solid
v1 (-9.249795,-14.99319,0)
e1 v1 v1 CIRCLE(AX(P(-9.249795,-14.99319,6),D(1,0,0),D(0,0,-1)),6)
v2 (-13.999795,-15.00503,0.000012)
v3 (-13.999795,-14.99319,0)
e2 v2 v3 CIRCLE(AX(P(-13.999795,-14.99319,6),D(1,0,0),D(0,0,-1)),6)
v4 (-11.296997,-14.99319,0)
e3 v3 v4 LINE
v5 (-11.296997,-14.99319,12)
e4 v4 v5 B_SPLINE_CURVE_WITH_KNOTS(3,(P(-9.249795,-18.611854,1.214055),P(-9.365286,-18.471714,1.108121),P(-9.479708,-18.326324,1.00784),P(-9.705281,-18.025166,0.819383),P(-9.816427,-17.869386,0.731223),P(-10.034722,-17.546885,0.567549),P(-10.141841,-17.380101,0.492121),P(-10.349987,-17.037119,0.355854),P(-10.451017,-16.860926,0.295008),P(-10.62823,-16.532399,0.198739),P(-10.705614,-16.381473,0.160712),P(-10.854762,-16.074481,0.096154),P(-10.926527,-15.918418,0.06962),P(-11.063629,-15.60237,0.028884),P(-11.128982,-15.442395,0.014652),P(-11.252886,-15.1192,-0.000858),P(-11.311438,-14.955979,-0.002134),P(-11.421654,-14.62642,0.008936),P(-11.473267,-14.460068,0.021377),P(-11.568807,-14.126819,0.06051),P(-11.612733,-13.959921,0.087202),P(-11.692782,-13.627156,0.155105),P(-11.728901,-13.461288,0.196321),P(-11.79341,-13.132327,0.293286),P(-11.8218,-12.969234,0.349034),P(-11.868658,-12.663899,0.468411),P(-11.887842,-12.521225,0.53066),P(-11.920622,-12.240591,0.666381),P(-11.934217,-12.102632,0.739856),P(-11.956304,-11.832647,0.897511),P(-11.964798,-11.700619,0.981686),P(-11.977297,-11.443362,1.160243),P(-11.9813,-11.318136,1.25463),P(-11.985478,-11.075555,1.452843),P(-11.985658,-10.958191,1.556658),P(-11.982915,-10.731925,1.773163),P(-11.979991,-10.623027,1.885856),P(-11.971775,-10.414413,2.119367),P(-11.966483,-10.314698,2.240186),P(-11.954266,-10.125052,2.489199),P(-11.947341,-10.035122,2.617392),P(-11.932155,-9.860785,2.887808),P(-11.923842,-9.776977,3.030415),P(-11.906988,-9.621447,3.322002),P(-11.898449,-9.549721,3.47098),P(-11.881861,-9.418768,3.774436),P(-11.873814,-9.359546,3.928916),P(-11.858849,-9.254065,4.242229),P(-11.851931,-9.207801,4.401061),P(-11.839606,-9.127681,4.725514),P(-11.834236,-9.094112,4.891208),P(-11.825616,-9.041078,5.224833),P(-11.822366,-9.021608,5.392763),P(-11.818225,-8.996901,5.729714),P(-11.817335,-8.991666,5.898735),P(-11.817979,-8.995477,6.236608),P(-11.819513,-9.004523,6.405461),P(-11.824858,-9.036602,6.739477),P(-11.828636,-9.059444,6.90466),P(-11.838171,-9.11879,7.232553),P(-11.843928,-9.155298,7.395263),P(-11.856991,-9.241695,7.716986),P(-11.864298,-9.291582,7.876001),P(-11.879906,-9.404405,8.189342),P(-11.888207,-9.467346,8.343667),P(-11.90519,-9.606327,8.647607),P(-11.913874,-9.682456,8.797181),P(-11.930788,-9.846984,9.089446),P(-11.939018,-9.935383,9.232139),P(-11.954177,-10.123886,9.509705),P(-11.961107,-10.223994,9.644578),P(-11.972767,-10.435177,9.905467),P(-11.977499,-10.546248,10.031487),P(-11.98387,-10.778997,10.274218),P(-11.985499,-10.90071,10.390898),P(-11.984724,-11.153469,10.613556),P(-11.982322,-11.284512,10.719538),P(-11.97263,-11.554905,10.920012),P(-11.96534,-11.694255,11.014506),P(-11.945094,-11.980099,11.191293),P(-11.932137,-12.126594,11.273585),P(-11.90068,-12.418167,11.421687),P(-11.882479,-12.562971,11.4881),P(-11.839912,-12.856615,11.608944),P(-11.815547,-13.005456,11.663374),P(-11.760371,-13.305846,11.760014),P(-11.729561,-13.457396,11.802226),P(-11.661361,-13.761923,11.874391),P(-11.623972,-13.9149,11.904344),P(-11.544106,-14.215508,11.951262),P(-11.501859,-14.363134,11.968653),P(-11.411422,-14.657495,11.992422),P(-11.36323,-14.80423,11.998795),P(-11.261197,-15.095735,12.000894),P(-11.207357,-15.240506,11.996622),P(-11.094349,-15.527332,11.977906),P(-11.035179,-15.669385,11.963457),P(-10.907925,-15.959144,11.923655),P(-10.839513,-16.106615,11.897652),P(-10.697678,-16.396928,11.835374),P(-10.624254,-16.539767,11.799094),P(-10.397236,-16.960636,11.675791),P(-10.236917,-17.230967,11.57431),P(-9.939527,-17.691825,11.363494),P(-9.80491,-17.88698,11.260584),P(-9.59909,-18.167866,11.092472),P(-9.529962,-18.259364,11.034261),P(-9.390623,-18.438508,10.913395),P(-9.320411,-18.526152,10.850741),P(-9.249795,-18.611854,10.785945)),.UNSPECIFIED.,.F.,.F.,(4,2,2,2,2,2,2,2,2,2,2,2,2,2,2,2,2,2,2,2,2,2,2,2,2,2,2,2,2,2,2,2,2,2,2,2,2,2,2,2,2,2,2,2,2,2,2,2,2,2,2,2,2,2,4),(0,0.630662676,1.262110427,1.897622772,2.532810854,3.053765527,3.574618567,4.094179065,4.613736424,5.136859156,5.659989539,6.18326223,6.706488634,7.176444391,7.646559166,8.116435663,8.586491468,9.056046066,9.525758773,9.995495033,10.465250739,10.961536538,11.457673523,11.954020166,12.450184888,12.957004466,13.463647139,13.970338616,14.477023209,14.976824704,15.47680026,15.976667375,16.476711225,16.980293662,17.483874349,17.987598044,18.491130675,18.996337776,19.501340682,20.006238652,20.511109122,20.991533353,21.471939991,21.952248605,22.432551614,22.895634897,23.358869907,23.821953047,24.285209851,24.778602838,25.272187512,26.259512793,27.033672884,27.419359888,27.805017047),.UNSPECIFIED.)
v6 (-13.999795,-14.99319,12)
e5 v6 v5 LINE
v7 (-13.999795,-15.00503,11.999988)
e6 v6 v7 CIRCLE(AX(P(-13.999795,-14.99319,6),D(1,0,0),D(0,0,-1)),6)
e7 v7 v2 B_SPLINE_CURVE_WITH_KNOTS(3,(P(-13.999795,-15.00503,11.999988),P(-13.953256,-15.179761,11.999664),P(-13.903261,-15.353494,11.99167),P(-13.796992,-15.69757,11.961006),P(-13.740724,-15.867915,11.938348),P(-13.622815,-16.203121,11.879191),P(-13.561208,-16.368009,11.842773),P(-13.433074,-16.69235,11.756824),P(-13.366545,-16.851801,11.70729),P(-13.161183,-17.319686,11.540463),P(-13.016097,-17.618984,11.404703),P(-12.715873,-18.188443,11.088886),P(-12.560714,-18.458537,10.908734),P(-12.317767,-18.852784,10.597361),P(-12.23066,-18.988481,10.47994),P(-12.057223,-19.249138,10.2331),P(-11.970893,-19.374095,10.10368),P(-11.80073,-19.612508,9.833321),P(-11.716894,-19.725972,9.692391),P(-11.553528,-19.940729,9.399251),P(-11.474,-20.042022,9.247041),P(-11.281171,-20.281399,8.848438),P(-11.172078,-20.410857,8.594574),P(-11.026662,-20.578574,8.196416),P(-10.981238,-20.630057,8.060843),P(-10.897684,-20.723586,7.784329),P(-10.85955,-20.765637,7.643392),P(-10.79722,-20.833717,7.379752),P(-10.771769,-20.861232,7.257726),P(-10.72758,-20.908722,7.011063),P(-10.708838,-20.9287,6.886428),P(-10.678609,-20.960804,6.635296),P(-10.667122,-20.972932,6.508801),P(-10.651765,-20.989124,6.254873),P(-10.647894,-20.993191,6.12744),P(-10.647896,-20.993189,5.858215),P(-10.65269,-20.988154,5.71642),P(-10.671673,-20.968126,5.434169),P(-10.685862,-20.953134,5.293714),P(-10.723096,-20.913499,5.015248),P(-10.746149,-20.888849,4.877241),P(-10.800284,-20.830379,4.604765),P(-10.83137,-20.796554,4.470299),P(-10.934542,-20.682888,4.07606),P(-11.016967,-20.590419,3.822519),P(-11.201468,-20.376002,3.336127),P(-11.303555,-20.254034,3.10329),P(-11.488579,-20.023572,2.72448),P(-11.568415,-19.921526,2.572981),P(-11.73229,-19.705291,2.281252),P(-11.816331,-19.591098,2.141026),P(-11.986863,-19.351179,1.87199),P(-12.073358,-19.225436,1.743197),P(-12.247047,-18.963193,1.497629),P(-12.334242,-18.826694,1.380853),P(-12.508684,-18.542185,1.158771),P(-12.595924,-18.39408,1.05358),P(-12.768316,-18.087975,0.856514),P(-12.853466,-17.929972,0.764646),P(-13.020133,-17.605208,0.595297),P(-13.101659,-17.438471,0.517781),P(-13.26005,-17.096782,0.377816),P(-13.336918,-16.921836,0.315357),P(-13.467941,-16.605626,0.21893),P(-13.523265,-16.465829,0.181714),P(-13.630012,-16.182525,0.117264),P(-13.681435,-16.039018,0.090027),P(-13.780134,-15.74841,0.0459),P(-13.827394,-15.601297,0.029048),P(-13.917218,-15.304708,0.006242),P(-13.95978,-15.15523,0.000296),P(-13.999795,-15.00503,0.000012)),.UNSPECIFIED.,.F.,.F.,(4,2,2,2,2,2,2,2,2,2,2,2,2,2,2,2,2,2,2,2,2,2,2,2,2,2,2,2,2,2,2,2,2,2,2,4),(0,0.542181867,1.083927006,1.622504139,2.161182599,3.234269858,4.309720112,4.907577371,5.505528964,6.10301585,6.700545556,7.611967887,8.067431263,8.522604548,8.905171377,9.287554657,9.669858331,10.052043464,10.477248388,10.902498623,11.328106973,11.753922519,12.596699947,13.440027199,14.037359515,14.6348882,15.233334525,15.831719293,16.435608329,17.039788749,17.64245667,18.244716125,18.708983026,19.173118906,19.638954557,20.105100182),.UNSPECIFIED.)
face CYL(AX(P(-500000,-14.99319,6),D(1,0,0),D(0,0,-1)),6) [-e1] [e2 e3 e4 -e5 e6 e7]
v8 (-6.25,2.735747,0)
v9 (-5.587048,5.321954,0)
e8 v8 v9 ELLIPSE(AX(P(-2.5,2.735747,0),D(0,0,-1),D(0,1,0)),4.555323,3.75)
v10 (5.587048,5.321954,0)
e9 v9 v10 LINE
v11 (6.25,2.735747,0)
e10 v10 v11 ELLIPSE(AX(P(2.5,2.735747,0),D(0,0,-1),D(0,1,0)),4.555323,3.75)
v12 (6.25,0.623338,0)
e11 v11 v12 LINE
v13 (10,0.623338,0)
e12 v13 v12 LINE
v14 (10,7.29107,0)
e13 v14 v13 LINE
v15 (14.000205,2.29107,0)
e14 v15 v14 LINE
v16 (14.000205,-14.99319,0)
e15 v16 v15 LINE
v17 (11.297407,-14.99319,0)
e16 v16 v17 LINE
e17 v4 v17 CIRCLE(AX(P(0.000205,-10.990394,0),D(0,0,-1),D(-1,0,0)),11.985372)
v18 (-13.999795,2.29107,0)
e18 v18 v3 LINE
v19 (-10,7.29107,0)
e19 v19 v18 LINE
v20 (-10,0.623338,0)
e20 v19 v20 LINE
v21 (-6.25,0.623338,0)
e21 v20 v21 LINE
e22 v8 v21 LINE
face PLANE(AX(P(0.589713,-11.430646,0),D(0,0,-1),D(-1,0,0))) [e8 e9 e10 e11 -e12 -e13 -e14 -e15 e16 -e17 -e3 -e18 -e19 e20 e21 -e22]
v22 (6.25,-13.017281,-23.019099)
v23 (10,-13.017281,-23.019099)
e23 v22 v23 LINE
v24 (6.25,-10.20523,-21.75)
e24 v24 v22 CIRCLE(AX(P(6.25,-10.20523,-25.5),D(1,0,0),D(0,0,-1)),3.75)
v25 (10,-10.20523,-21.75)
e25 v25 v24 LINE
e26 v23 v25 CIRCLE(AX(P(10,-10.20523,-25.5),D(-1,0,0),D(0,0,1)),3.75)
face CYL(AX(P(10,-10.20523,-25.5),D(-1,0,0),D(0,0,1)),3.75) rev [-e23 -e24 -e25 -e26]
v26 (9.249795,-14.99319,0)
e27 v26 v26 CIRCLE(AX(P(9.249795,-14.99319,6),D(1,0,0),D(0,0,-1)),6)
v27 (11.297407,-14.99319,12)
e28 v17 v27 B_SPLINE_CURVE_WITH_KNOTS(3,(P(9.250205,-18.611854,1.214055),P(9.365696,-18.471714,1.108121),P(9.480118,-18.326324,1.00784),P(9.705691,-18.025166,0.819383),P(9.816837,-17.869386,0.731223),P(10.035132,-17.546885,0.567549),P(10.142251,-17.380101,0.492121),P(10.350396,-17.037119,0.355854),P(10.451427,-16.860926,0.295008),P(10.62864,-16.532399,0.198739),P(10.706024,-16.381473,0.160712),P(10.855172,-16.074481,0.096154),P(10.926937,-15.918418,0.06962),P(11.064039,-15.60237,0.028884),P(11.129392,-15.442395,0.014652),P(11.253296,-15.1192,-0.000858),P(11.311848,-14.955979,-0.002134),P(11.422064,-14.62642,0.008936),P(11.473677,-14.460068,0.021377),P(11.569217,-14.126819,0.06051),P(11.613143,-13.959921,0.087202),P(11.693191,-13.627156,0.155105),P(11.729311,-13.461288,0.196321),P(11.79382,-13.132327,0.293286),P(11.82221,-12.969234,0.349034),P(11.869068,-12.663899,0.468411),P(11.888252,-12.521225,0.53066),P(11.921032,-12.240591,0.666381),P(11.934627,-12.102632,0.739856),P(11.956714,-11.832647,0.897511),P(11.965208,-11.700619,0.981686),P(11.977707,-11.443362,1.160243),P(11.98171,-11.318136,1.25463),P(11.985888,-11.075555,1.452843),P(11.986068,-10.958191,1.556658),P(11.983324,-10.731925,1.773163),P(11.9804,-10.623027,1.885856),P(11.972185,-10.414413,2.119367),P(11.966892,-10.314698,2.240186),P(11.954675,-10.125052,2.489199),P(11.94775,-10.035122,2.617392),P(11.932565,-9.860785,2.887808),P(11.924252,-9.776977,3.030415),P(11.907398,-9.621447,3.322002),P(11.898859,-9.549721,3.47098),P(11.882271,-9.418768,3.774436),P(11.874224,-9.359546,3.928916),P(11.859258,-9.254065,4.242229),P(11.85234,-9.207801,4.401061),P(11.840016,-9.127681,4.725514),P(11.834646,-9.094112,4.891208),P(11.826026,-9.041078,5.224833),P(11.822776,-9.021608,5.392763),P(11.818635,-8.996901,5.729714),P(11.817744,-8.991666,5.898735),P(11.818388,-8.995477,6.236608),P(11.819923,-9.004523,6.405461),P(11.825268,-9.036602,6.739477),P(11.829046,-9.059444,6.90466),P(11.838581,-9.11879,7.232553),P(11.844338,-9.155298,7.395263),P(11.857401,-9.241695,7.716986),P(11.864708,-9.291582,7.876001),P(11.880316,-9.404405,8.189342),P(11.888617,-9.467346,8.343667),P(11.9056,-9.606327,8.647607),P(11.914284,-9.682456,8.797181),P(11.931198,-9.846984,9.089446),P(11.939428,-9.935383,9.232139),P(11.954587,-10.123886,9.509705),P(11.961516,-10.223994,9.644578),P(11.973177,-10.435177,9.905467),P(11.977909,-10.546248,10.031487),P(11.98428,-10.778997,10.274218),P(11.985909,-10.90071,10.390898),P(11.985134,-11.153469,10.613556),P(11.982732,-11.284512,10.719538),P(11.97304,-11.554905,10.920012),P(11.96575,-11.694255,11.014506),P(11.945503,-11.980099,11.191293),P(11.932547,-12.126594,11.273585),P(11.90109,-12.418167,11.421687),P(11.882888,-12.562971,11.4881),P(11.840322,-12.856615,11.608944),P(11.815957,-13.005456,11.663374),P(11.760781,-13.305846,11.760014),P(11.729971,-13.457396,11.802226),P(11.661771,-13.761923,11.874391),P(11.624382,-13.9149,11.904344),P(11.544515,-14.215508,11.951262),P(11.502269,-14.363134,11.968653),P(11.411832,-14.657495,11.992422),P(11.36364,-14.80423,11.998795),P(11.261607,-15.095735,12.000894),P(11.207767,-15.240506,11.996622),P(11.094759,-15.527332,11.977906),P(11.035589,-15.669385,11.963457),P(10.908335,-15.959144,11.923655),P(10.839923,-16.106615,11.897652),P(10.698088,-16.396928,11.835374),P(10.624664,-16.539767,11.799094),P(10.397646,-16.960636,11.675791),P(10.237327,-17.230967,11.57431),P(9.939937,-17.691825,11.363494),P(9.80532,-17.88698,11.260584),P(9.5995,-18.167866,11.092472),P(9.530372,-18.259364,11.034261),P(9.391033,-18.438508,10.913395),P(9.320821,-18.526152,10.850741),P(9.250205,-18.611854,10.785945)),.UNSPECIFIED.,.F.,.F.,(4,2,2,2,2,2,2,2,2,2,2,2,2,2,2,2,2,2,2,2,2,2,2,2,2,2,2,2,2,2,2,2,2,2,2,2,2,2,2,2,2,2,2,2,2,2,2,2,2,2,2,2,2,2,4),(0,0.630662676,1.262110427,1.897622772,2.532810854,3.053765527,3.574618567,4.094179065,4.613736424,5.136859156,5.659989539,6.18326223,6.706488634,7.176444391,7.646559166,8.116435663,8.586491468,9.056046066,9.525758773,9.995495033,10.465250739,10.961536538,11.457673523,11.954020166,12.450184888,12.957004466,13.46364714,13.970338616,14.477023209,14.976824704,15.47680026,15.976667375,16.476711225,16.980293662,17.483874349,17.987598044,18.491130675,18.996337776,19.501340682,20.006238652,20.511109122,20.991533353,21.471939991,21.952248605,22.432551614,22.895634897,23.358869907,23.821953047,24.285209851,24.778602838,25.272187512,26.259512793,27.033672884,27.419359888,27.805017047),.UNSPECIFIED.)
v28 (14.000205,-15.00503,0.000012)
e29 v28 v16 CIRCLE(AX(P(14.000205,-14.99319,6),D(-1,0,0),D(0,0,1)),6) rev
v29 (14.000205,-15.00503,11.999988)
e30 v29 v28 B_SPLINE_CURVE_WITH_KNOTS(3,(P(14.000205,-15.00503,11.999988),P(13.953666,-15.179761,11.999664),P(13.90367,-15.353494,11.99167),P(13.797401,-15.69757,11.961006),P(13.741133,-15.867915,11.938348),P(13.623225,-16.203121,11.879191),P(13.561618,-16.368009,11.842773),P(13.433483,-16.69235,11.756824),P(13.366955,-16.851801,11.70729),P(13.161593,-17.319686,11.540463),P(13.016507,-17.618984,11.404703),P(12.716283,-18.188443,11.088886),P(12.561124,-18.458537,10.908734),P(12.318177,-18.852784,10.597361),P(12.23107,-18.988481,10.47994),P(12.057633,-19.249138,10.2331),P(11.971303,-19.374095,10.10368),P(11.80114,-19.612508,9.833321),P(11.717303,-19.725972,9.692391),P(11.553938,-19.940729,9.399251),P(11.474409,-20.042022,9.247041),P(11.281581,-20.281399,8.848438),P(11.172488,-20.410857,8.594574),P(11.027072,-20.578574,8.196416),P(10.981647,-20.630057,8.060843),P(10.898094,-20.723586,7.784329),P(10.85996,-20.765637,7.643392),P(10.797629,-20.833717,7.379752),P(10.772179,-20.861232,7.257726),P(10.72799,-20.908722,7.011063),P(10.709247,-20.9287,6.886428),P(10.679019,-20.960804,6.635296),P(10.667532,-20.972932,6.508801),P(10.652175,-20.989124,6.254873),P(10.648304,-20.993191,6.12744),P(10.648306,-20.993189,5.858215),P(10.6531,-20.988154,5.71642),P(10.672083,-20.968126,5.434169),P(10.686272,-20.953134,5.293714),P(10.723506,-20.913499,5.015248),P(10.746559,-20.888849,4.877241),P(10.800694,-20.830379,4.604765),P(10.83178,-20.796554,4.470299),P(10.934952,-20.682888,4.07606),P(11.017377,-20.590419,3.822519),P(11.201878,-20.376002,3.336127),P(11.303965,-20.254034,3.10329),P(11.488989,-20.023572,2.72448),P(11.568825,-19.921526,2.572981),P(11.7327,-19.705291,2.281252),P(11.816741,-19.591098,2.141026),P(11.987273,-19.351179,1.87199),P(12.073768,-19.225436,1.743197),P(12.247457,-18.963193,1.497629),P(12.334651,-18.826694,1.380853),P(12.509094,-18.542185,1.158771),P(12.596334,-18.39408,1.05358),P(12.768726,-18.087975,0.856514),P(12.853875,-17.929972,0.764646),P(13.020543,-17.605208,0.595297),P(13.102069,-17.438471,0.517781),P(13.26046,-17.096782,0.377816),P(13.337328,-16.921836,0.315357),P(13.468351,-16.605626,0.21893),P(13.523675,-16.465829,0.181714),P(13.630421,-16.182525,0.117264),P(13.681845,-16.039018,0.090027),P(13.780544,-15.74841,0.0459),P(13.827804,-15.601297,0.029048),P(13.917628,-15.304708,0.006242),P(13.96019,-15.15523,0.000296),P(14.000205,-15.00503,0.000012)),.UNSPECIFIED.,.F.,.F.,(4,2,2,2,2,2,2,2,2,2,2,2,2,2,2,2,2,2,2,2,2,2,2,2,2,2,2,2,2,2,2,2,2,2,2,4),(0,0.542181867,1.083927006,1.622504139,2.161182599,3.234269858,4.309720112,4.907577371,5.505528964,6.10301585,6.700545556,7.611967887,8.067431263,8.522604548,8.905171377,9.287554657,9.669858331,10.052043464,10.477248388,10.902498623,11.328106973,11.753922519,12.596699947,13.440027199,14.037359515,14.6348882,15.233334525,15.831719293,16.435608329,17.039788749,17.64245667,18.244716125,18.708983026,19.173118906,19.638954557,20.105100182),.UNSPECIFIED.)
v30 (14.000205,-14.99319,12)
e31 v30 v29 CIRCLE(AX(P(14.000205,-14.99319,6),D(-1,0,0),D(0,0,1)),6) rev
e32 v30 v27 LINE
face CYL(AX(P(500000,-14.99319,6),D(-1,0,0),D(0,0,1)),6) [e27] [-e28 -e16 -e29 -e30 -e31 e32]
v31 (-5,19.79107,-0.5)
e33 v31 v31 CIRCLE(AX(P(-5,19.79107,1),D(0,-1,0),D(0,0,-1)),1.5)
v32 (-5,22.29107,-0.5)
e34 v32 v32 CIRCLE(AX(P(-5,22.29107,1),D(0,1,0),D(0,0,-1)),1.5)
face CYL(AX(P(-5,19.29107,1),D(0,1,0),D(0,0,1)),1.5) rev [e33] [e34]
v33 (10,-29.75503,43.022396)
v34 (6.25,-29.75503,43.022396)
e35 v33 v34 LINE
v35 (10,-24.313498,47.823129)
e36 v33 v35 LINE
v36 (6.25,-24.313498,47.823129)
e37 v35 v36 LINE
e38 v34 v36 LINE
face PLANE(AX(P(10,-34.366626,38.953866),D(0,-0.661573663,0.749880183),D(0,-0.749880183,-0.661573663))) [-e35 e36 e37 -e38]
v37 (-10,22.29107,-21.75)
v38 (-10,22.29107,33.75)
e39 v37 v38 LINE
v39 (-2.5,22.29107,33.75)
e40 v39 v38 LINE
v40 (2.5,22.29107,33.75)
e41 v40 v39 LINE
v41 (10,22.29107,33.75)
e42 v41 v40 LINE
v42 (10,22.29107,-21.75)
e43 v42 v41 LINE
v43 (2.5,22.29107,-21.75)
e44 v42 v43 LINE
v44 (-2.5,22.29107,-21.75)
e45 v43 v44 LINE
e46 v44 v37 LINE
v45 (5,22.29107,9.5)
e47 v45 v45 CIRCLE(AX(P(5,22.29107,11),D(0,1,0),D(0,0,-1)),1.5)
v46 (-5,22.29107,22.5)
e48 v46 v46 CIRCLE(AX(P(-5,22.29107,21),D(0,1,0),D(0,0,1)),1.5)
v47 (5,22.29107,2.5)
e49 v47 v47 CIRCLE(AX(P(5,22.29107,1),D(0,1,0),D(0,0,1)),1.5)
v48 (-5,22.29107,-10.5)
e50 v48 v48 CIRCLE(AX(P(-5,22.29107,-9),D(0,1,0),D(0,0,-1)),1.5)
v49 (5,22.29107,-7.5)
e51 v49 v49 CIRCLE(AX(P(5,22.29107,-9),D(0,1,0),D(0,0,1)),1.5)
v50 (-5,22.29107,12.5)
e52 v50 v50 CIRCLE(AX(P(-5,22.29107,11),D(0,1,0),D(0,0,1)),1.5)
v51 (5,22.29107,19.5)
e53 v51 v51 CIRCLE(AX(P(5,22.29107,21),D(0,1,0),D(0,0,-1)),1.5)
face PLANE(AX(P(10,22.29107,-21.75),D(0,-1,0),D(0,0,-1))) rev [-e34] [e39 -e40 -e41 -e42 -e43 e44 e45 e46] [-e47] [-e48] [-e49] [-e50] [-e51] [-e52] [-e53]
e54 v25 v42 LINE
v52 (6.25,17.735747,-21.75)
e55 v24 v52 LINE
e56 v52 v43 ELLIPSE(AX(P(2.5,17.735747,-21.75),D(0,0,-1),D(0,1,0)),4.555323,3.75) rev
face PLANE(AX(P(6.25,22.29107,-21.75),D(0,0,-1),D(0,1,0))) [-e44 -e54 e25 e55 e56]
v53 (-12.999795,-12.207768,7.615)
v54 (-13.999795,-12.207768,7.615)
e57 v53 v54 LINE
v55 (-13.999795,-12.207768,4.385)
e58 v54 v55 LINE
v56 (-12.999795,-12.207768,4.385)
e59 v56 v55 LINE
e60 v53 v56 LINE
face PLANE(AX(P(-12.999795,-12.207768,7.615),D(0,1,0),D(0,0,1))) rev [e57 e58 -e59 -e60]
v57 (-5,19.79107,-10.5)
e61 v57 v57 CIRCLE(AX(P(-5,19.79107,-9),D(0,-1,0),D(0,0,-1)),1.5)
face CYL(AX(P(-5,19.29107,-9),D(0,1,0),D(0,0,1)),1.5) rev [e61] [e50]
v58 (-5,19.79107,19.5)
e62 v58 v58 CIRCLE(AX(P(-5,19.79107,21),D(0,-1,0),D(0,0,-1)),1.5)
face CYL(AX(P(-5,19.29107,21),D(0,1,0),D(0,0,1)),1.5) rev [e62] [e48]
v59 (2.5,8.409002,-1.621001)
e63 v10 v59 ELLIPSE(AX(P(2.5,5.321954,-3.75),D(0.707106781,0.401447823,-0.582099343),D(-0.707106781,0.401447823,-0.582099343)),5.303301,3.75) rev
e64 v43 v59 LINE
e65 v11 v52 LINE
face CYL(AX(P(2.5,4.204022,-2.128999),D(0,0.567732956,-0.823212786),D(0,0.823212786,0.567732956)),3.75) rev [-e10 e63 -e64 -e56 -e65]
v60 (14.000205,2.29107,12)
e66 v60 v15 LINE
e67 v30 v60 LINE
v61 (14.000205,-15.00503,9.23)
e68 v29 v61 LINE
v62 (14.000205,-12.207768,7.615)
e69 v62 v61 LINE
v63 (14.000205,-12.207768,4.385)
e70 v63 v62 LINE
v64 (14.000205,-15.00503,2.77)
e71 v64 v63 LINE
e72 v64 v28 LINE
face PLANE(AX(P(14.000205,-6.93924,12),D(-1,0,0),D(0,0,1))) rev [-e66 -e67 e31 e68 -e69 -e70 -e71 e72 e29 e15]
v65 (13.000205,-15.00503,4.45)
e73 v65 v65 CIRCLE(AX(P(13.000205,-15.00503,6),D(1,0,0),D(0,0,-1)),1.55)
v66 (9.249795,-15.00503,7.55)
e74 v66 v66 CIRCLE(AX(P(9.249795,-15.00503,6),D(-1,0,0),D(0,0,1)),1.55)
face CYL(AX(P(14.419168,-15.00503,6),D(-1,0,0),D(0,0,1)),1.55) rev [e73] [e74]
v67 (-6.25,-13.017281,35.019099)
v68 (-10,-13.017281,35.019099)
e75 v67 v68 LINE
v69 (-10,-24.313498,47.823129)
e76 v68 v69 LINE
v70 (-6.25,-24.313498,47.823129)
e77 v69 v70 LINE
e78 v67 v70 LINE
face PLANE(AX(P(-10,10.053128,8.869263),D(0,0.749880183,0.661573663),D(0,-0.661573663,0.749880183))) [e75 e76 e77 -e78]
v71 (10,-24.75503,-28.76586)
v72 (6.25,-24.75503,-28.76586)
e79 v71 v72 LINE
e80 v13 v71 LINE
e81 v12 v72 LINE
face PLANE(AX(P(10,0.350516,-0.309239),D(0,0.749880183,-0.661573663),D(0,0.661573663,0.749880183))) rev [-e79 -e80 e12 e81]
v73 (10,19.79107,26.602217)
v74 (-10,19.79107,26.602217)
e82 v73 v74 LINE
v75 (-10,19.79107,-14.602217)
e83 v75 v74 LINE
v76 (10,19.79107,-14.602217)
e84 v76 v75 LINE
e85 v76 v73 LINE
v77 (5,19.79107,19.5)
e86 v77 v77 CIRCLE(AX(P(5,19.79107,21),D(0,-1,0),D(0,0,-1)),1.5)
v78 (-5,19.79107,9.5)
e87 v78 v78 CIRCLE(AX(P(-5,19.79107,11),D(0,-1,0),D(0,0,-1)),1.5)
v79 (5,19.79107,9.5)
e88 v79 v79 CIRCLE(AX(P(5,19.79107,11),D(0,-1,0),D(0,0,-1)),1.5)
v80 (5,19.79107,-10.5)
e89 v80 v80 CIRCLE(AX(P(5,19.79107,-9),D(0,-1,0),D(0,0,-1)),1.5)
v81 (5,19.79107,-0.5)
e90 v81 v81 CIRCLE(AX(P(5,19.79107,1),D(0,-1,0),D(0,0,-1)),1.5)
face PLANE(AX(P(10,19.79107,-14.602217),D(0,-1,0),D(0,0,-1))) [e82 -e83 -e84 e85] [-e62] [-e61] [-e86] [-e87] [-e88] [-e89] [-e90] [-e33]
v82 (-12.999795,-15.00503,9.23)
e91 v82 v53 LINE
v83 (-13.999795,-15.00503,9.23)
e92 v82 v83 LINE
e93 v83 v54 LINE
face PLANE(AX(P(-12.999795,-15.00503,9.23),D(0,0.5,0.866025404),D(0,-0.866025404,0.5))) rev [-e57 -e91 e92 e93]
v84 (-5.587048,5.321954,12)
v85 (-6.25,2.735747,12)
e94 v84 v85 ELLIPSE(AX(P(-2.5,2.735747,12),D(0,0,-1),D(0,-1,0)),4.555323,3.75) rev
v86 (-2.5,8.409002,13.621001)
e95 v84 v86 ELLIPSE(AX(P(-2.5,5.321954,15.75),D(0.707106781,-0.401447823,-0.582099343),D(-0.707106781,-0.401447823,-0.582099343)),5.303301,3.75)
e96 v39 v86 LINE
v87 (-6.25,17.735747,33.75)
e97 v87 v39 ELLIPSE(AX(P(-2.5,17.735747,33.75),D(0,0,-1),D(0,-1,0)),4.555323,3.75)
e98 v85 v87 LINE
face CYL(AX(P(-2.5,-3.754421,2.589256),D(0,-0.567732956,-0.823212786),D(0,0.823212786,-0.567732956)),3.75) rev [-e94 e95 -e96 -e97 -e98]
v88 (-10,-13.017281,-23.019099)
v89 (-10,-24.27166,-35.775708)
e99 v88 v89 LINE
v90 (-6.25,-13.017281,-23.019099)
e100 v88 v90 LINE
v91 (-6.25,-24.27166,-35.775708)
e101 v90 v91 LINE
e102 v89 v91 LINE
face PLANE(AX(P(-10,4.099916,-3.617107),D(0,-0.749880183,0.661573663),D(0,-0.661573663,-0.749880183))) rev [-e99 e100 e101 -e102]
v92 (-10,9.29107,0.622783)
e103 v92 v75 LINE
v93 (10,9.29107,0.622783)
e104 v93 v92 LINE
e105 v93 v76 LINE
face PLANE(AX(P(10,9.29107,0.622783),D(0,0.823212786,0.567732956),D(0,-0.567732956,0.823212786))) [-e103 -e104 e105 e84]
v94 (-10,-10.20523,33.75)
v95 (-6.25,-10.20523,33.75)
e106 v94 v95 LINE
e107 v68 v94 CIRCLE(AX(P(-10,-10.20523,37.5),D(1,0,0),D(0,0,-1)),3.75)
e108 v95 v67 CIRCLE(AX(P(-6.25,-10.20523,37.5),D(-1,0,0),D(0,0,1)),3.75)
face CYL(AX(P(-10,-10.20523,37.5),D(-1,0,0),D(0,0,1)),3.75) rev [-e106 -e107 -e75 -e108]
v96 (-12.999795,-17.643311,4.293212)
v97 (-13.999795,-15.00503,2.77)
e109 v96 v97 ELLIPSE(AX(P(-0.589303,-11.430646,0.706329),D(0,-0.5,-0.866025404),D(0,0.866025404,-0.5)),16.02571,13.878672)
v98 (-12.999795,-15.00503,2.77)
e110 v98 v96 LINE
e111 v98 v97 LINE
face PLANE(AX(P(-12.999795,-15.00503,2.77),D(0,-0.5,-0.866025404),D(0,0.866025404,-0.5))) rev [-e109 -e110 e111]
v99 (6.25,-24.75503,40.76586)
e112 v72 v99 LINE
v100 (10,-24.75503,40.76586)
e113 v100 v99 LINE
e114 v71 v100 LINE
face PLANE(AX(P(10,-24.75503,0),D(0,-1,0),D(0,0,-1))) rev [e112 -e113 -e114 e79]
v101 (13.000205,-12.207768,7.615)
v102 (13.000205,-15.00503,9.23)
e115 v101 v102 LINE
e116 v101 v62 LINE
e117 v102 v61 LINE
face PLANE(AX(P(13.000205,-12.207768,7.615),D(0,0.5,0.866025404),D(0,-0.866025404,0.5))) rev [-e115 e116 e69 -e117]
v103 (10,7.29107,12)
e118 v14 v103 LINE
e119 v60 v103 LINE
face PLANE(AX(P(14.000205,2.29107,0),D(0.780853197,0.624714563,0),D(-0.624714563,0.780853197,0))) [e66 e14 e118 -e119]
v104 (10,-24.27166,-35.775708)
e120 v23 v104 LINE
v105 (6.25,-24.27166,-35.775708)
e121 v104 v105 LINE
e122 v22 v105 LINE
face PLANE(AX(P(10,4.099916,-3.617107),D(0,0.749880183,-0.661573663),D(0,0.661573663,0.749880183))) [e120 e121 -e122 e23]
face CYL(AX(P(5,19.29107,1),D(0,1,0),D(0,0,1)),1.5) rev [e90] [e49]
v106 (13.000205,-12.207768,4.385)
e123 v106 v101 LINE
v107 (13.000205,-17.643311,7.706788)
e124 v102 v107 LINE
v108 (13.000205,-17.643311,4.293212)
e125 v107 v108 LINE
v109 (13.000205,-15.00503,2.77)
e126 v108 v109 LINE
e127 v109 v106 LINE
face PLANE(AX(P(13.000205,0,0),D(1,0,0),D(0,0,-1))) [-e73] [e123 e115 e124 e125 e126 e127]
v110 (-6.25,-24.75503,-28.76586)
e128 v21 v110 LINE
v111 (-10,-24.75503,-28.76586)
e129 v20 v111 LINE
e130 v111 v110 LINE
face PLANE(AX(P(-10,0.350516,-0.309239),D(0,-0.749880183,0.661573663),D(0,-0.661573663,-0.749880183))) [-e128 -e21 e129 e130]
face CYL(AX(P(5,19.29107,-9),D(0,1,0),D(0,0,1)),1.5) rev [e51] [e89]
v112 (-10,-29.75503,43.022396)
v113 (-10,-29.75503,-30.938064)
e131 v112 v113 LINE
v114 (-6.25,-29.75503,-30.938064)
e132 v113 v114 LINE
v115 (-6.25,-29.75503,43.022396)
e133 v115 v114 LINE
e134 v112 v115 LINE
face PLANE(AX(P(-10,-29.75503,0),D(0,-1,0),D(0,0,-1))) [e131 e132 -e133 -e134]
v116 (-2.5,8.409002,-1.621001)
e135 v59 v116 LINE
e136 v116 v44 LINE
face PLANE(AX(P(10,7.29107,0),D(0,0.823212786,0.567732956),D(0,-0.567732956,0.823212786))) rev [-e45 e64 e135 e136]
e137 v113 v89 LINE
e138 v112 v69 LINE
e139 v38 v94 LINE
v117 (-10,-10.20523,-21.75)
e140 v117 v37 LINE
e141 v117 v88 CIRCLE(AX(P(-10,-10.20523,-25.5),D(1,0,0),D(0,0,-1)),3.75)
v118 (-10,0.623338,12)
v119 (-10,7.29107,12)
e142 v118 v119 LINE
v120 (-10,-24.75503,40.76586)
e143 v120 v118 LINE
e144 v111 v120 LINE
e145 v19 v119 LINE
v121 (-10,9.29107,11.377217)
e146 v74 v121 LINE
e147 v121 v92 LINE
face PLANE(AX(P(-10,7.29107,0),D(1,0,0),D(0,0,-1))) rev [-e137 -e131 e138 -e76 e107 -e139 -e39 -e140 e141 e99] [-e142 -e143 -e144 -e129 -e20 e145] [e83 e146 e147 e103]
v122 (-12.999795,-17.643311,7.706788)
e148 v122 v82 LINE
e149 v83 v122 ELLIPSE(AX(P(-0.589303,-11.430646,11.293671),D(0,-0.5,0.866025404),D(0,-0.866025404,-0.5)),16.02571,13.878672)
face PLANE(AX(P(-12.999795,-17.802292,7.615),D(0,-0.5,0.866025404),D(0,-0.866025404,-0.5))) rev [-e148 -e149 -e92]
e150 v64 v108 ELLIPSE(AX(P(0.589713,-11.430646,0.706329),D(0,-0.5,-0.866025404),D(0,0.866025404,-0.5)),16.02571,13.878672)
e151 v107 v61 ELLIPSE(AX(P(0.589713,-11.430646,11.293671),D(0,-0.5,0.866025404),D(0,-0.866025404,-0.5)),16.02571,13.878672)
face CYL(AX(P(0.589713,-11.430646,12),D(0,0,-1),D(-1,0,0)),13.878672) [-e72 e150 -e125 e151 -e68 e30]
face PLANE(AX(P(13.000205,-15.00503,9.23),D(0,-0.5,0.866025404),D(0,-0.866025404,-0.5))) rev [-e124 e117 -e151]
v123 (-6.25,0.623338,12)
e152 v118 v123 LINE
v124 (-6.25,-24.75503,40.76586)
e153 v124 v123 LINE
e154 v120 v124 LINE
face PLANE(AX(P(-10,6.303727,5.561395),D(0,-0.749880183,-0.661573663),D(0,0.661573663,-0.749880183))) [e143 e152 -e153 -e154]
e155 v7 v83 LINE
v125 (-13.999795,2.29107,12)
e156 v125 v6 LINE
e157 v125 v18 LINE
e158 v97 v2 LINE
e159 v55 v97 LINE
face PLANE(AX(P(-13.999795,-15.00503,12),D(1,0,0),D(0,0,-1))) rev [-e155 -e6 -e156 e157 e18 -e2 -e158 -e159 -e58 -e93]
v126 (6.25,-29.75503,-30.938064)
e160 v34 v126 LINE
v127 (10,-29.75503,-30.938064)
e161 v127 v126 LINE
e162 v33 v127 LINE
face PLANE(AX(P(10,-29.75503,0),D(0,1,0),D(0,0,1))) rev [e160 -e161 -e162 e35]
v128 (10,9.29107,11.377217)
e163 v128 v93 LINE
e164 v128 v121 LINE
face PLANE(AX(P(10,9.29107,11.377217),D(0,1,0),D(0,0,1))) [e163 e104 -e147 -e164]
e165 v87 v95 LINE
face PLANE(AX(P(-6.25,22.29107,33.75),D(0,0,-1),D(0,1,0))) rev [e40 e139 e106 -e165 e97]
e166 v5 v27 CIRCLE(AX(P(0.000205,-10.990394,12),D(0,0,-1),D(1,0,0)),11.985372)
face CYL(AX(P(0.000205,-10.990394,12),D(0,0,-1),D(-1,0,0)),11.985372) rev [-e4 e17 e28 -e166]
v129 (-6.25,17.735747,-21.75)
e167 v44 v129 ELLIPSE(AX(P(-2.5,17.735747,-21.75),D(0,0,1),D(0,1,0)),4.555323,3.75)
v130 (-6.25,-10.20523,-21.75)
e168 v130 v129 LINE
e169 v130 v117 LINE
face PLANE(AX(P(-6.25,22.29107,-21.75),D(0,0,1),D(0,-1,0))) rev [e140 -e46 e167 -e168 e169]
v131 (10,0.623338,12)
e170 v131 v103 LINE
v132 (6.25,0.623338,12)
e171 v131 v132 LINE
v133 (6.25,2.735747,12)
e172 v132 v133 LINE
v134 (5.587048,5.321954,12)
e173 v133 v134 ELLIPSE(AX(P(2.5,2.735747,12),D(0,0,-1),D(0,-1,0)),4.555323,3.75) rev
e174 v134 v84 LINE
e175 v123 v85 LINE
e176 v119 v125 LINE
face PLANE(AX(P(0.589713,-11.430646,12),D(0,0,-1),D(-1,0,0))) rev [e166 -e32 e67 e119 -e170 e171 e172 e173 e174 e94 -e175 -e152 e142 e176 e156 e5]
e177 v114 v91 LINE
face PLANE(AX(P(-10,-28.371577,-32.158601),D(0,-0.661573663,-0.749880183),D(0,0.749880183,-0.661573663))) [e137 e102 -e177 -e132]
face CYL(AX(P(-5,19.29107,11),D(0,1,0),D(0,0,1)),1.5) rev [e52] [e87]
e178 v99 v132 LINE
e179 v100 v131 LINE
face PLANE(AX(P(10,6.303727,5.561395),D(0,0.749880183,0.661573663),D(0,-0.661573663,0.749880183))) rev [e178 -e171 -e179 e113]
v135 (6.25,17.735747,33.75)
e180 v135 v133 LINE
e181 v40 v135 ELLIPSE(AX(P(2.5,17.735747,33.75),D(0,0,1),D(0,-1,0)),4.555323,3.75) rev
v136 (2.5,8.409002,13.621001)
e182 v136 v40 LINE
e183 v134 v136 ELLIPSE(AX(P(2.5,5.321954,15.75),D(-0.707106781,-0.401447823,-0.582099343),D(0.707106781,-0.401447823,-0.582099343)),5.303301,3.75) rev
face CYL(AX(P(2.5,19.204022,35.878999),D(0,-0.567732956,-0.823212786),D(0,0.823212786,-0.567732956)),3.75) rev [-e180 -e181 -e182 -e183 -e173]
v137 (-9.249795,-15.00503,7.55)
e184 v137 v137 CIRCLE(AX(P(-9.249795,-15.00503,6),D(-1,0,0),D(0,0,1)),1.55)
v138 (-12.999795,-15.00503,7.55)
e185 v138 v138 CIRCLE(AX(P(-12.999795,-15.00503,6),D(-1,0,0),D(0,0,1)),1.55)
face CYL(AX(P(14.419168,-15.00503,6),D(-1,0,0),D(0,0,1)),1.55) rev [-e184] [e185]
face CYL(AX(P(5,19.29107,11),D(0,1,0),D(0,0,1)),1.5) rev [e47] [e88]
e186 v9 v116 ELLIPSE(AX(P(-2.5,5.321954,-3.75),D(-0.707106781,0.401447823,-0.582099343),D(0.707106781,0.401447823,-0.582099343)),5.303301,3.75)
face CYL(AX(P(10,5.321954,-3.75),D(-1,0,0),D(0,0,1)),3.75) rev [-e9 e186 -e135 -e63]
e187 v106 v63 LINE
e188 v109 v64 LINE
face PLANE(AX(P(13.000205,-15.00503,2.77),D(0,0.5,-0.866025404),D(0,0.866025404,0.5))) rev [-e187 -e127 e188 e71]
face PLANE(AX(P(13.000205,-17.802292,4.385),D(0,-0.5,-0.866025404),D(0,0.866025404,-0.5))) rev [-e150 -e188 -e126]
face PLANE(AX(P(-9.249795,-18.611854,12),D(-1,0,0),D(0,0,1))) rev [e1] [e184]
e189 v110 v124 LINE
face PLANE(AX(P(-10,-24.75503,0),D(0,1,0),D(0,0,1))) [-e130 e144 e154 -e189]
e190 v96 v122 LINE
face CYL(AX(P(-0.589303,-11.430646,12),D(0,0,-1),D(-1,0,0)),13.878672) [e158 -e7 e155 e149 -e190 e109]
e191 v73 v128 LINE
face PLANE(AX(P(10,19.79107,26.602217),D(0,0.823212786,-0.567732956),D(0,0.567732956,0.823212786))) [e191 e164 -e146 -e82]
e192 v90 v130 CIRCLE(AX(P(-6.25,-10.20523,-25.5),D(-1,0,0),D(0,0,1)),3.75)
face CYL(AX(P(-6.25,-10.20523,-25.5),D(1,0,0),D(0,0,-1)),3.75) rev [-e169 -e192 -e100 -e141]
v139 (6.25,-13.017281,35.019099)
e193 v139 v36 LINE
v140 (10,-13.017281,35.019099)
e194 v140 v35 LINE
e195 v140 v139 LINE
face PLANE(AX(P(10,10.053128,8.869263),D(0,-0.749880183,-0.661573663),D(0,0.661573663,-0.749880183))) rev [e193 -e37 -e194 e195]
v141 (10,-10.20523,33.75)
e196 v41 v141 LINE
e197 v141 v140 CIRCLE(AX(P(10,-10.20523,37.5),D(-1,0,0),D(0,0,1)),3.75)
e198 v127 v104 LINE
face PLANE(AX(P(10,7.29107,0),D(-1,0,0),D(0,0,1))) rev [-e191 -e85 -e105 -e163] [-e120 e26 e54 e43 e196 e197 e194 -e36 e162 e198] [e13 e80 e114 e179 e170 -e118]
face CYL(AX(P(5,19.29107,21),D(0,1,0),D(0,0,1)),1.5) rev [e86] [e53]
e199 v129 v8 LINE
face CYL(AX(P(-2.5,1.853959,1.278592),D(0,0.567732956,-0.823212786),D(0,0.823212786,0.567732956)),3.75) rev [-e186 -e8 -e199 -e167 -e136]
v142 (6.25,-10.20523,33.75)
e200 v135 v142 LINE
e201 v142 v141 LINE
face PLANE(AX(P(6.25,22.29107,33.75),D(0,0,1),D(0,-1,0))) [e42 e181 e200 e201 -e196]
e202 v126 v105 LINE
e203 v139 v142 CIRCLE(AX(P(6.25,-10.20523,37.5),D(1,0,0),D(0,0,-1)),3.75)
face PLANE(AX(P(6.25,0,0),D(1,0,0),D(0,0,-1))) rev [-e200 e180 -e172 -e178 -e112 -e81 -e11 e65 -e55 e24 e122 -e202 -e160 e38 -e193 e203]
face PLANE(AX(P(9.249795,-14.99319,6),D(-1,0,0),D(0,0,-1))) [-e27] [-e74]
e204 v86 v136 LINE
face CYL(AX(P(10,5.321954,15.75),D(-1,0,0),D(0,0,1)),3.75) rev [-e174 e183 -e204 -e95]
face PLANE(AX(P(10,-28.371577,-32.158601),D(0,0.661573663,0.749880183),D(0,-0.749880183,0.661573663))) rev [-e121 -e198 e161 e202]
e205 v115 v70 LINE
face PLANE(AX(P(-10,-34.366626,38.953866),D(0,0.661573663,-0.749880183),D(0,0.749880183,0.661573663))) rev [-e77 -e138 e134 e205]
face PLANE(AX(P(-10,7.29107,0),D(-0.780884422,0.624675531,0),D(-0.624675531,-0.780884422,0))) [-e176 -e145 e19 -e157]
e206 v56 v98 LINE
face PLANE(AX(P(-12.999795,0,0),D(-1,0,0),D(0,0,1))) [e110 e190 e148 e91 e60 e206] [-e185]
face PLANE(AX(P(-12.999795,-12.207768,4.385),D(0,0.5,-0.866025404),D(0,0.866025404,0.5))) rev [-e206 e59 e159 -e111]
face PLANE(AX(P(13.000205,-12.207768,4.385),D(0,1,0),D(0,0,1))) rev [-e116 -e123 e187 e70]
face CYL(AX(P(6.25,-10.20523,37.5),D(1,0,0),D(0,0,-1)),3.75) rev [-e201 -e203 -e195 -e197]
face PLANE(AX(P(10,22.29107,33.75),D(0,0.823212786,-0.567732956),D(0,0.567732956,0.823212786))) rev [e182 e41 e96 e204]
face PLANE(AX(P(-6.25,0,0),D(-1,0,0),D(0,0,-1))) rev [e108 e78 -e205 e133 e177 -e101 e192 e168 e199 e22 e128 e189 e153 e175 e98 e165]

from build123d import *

# Parameters (mm, degrees)
EXTRUDE_1_DEPTH      = 12
EXTRUDE_2_REACH      = 35.545
EXTRUDE_2_END_RADIUS = 11.985372339
SKETCH_2_R           = 6
MIRROR_START         = 9.249795062
MIRROR_1_DEPTH       = 2.735782315
MIRROR_1_2_DEPTH     = 0.000409876
CUT_EXTRUDE_1_DEPTH  = 34.545141776
CUT_EXTRUDE_2_DEPTH  = 1
CUT_EXTRUDE_3_DEPTH  = 1
MIRROR_START_2       = 9.250204938
MIRROR_3_DEPTH       = 5.749795062
SKETCH_6_R           = 1.55
CUT_EXTRUDE_4_DEPTH  = 37.245193425
SKETCH_12_W          = 20
SKETCH_12_H          = 12
EXTRUDE_4_DEPTH      = 5
EXTRUDE_5_DEPTH      = 10
EXTRUDE_6_DEPTH      = 12
EXTRUDE_7_DEPTH      = 3.75
EXTRUDE_8_DEPTH      = 3.75
FILLET_1_R           = 3.75
FILLET_2_R           = 3.75
SKETCH_21_R          = 1.5
CUT_EXTRUDE_5_DEPTH  = 3


with BuildPart() as part:
    # 스케치1 → 보스-돌출1 (new body)
    with BuildSketch(Plane.XY):
        with BuildLine():
            Line((14.000204938, 2.291069809), (-13.999795062, 2.291069809))
            Line((-13.999795062, 2.291069809), (-13.999795062, -6.939240191))
            Line((-13.999795062, -6.939240191), (-13.999795062, -15.005030191))
            ThreePointArc((-13.999795062, -15.005030191), (-12.699794, -18.209549332), (-10.647895062, -20.993190191))
            Line((-10.647895062, -20.993190191), (-9.249795062, -20.993190191))
            Line((-9.249795062, -20.993190191), (-9.249795062, -18.61185417))
            ThreePointArc((-9.249795062, -18.61185417), (-10.428409882, -16.897436148), (-11.292795062, -15.005030191))
            ThreePointArc((-11.292795062, -15.005030191), (0.000204938, 0.99497801), (11.293204938, -15.005030191))
            ThreePointArc((11.293204938, -15.005030191), (10.428819757, -16.897436148), (9.250204938, -18.61185417))
            Line((9.250204938, -18.61185417), (9.250204938, -20.993190191))
            Line((9.250204938, -20.993190191), (10.648304938, -20.993190191))
            ThreePointArc((10.648304938, -20.993190191), (12.700203875, -18.209549332), (14.000204938, -15.005030191))
            Line((14.000204938, -15.005030191), (14.000204938, -6.939240191))
            Line((14.000204938, -6.939240191), (14.000204938, 2.291069809))
        make_face()
    extrude(amount=EXTRUDE_1_DEPTH)

    # 보스-돌출2: up to this cylinder (the profile starts inside it)
    extrude_2_end = Plane(origin=(0.000204938, -10.990394329, 6), z_dir=(0, 0, -1)) * Cylinder(EXTRUDE_2_END_RADIUS, 96.060744678, mode=Mode.PRIVATE)
    # 스케치2 → 보스-돌출2 (add, up to the surface)
    with BuildSketch(Plane(origin=(-9.249795062, 0, 0), x_dir=(0, 0, -1), z_dir=(1, 0, 0)), mode=Mode.PRIVATE) as extrude_2_sk1:
        with Locations((-6, -14.993190191)):
            Circle(SKETCH_2_R)
    extrude_2_tool1 = extrude(extrude_2_sk1.sketch, amount=-EXTRUDE_2_REACH, mode=Mode.PRIVATE) & extrude_2_end
    add(extrude_2_tool1.solids().sort_by_distance((-9.249795, -14.99319, 6))[0])

    # 대칭 복사1: read off the stored shape, not the designer's step
    # 대칭 복사1 outline → 대칭 복사1 (add)
    with BuildSketch(Plane.YZ.offset(MIRROR_START)):
        with BuildLine():
            ThreePointArc((-18.61185417, 1.214054847), (-8.993190191, 6), (-18.61185417, 10.785945153))
            Line((-18.61185417, 10.785945153), (-18.61185417, 1.214054847))
        make_face()
    extrude(amount=MIRROR_1_DEPTH)

    # Mirror 1 2 outline → Mirror 1 2 (add)
    with BuildSketch(Plane.YZ.offset(MIRROR_START)):
        with BuildLine():
            Line((-18.61185417, 1.214054847), (-18.61185417, 10.785945153))
            ThreePointArc((-18.61185417, 10.785945153), (-20.993190191, 6), (-18.61185417, 1.214054847))
        make_face()
    extrude(amount=MIRROR_1_2_DEPTH)

    # 스케치3 → 컷-돌출1 (cut, through all)
    with BuildSketch(Plane(origin=(-9.249795062, 0, 0), x_dir=(0, 0, -1), z_dir=(1, 0, 0))):
        with BuildLine():
            Line((-6, -20.993190191), (0, -20.993190191))
            Line((0, -20.993190191), (0, -18.61185417))
            Line((0, -18.61185417), (-1.214054847, -18.61185417))
            ThreePointArc((-1.214054847, -18.61185417), (-3.327172272, -20.364967545), (-6, -20.993190191))
        make_face()
        with BuildLine():
            Line((-12, -20.993190191), (-6, -20.993190191))
            ThreePointArc((-6, -20.993190191), (-8.672827728, -20.364967545), (-10.785945153, -18.61185417))
            Line((-10.785945153, -18.61185417), (-12, -18.61185417))
            Line((-12, -18.61185417), (-12, -20.993190191))
        make_face()
        with BuildLine():
            Line((-12, -18.61185417), (-10.785945153, -18.61185417))
            ThreePointArc((-10.785945153, -18.61185417), (-11.688394805, -16.901635773), (-12, -14.993190191))
            Line((-12, -14.993190191), (-12, -18.61185417))
        make_face()
        with BuildLine():
            Line((-1.214054847, -18.61185417), (0, -18.61185417))
            Line((0, -18.61185417), (0, -14.993190191))
            ThreePointArc((0, -14.993190191), (-0.311605195, -16.901635773), (-1.214054847, -18.61185417))
        make_face()
    extrude(amount=-CUT_EXTRUDE_1_DEPTH, mode=Mode.SUBTRACT)

    # 스케치4 → 컷-돌출2 (cut)
    with BuildSketch(Plane.ZY.offset(13.999795062)):
        Polygon((9.23, -15.005030191), (7.615, -12.207768137), (4.385, -12.207768137), (2.77, -15.005030191), (4.385, -17.802292245), (7.615, -17.802292245), align=None)
    extrude(amount=-CUT_EXTRUDE_2_DEPTH, mode=Mode.SUBTRACT)

    # 스케치5 → 컷-돌출3 (cut)
    with BuildSketch(Plane(origin=(14.000204938, 0, 0), x_dir=(0, 0, -1), z_dir=(1, 0, 0))):
        Polygon((-2.77, -15.005030191), (-4.385, -12.207768137), (-7.615, -12.207768137), (-9.23, -15.005030191), (-7.615, -17.802292245), (-4.385, -17.802292245), align=None)
    extrude(amount=-CUT_EXTRUDE_3_DEPTH, mode=Mode.SUBTRACT)

    # 대칭 복사3: read off the stored shape, not the designer's step
    # 대칭 복사3 outline → 대칭 복사3 (cut)
    with BuildSketch(Plane.YZ.offset(MIRROR_START_2)):
        with BuildLine():
            ThreePointArc((-20.993190191, 6), (-19.235830878, 10.242640687), (-14.993190191, 12))
            Line((-14.993190191, 12), (-20.993190191, 12))
            Line((-20.993190191, 12), (-20.993190191, 6))
        make_face()
        with BuildLine():
            Line((-20.993190191, 0), (-14.993190191, 0))
            ThreePointArc((-14.993190191, 0), (-19.235830878, 1.757359313), (-20.993190191, 6))
            Line((-20.993190191, 6), (-20.993190191, 0))
        make_face()
    extrude(amount=MIRROR_3_DEPTH, mode=Mode.SUBTRACT)

    # 스케치6 → 컷-돌출4 (cut, through all)
    with BuildSketch(Plane.ZY.offset(12.999795062)):
        with Locations((6, -15.005030191)):
            Circle(SKETCH_6_R)
    extrude(amount=-CUT_EXTRUDE_4_DEPTH, mode=Mode.SUBTRACT)

    # 스케치12 → 보스-돌출4 (add)
    with BuildSketch(Plane(origin=(0, 2.291069809, 0), x_dir=(1, 0, 0), z_dir=(0, 1, 0))):
        with Locations((0, -6)):
            Rectangle(SKETCH_12_W, SKETCH_12_H)
    extrude(amount=EXTRUDE_4_DEPTH)

    # 스케치14 → 보스-돌출5 (add, symmetric)
    with BuildSketch(Plane(origin=(0, 0, 0), x_dir=(0, 0, -1), z_dir=(1, 0, 0))):
        Polygon((-12, 7.291069809), (0, 7.291069809), (21.75, 22.291069809), (-33.75, 22.291069809), align=None)
        Polygon((-11.377217009, 9.291069809), (-0.622782991, 9.291069809), (14.602217009, 19.791069809), (-26.602217009, 19.791069809), align=None, mode=Mode.SUBTRACT)
    extrude(amount=EXTRUDE_5_DEPTH, both=True)

    # 스케치15 → 보스-돌출6 (add)
    with BuildSketch(Plane.XY.offset(12)):
        Polygon((-10, 7.291069809), (-13.999795062, 2.291069809), (-10, 2.291069809), align=None)
        Polygon((10, 2.291069809), (14.000204938, 2.291069809), (10, 7.291069809), align=None)
    extrude(amount=-EXTRUDE_6_DEPTH)

    # 스케치19 → 보스-돌출7 (add)
    with BuildSketch(Plane(origin=(6.25, 0, 0), x_dir=(0, 0, -1), z_dir=(1, 0, 0))):
        Polygon((-12, 7.291069809), (-47.823129142, -24.313497594), (-43.022395989, -29.755030191), (30.938064105, -29.755030191), (35.775707613, -24.271660464), (0, 7.291069809), (0, 0.623337928), (28.765859914, -24.755030191), (-40.765859914, -24.755030191), (-12, 0.623337928), align=None)
    extrude_7 = extrude(amount=EXTRUDE_7_DEPTH)

    # 대칭 복사4: 보스-돌출7 across plane
    add(extrude_7.mirror(Plane(origin=(0, 0, 0), x_dir=(0, 0, 1), z_dir=(1, 0, 0))))

    # 스케치20 → 보스-돌출8 (add)
    with BuildSketch(Plane(origin=(10, 0, 0), x_dir=(0, 0, -1), z_dir=(1, 0, 0))):
        Polygon((-12, 7.291069809), (-33.75, 22.291069809), (-33.75, -11.897631945), align=None)
        Polygon((21.75, 22.291069809), (21.75, -11.897631945), (0, 7.291069809), align=None)
    extrude_8 = extrude(amount=-EXTRUDE_8_DEPTH)

    # 대칭 복사5: 보스-돌출8 across plane
    add(extrude_8.mirror(Plane(origin=(0, 0, 0), x_dir=(0, 0, 1), z_dir=(1, 0, 0))))

    # 필렛1
    # the kernel refuses this fillet: 3.75 mm, written as the material it adds along each edge
    with BuildSketch(Plane(origin=(-6.25, 7.291069809, 0), x_dir=(0, -1, 0), z_dir=(1, 0, 0))) as fillet_1_piece_1_section:
        with BuildLine():
            CenterArc((FILLET_1_R * 0.525097583021, FILLET_1_R), FILLET_1_R, 214.592288688, 55.407711312)
            Line((-FILLET_1_R * 0.298115202894, FILLET_1_R * 0.432267044196), (0, 0))
            Line((0, 0), (FILLET_1_R * 0.525097583021, 0))
        make_face()
    fillet_1_piece_1 = extrude(amount=17.422789841, mode=Mode.PRIVATE)
    fillet_1_piece_1 = split(fillet_1_piece_1, bisect_by=Plane(origin=(10, 7.291069809, 0), z_dir=(-1, 0, 0)), keep=Keep.TOP, mode=Mode.PRIVATE)
    add(fillet_1_piece_1)
    with BuildSketch(Plane(origin=(11.172789841, 7.291069809, 12), x_dir=(0, -1, 0), z_dir=(-1, 0, 0))) as fillet_1_piece_2_section:
        with BuildLine():
            CenterArc((FILLET_1_R * 0.525097583021, FILLET_1_R), FILLET_1_R, 214.592288688, 55.407711312)
            Line((-FILLET_1_R * 0.298115202894, FILLET_1_R * 0.432267044196), (0, 0))
            Line((0, 0), (FILLET_1_R * 0.525097583021, 0))
        make_face()
    fillet_1_piece_2 = extrude(amount=17.422789841, mode=Mode.PRIVATE)
    fillet_1_piece_2 = split(fillet_1_piece_2, bisect_by=Plane(origin=(10, 7.291069809, 12), z_dir=(-1, 0, 0)), keep=Keep.TOP, mode=Mode.PRIVATE)
    add(fillet_1_piece_2)
    with BuildSketch(Plane(origin=(6.25, 1.968573348, 4.282380132), x_dir=(-1, 0, 0), z_dir=(0, 0.5677329558036596, 0.8232127859153063))) as fillet_1_piece_3_section:
        with BuildLine():
            CenterArc((FILLET_1_R, FILLET_1_R), FILLET_1_R, 180, 90)
            Line((0, FILLET_1_R), (0, 0))
            Line((0, 0), (FILLET_1_R, 0))
        make_face()
    fillet_1_piece_3 = extrude(amount=45.170872431, mode=Mode.PRIVATE)
    fillet_1_piece_3 = split(fillet_1_piece_3, bisect_by=Plane(origin=(6.25, 1.968573348, 12), z_dir=(0, 0, 1)), keep=Keep.TOP, mode=Mode.PRIVATE)
    fillet_1_piece_3 = split(fillet_1_piece_3, bisect_by=Plane(origin=(6.25, 1.968573348, 33.75), z_dir=(0, 0, -1)), keep=Keep.TOP, mode=Mode.PRIVATE)
    add(fillet_1_piece_3)
    with BuildSketch(Plane(origin=(6.25, 1.968573348, 7.717619868), x_dir=(0, -0.8232127859153062, -0.5677329558036597), z_dir=(0, 0.5677329558036597, -0.8232127859153062))) as fillet_1_piece_4_section:
        with BuildLine():
            CenterArc((FILLET_1_R, FILLET_1_R), FILLET_1_R, 180, 90)
            Line((0, FILLET_1_R), (0, 0))
            Line((0, 0), (FILLET_1_R, 0))
        make_face()
    fillet_1_piece_4 = extrude(amount=45.170872431, mode=Mode.PRIVATE)
    fillet_1_piece_4 = split(fillet_1_piece_4, bisect_by=Plane(origin=(6.25, 1.968573348, 0), z_dir=(0, 0, -1)), keep=Keep.TOP, mode=Mode.PRIVATE)
    fillet_1_piece_4 = split(fillet_1_piece_4, bisect_by=Plane(origin=(6.25, 1.968573348, -21.75), z_dir=(0, 0, 1)), keep=Keep.TOP, mode=Mode.PRIVATE)
    add(fillet_1_piece_4)
    with BuildSketch(Plane(origin=(-6.25, 1.968573348, 4.282380132), x_dir=(0, -0.8232127859153063, 0.5677329558036595), z_dir=(0, 0.5677329558036596, 0.8232127859153063))) as fillet_1_piece_5_section:
        with BuildLine():
            CenterArc((FILLET_1_R, FILLET_1_R), FILLET_1_R, 180, 90)
            Line((0, FILLET_1_R), (0, 0))
            Line((0, 0), (FILLET_1_R, 0))
        make_face()
    fillet_1_piece_5 = extrude(amount=45.170872431, mode=Mode.PRIVATE)
    fillet_1_piece_5 = split(fillet_1_piece_5, bisect_by=Plane(origin=(-6.25, 1.968573348, 12), z_dir=(0, 0, 1)), keep=Keep.TOP, mode=Mode.PRIVATE)
    fillet_1_piece_5 = split(fillet_1_piece_5, bisect_by=Plane(origin=(-6.25, 1.968573348, 33.75), z_dir=(0, 0, -1)), keep=Keep.TOP, mode=Mode.PRIVATE)
    add(fillet_1_piece_5)
    with BuildSketch(Plane(origin=(-6.25, 1.968573348, 7.717619868), x_dir=(0, -0.8232127859153062, -0.5677329558036597), z_dir=(0, 0.5677329558036597, -0.8232127859153062))) as fillet_1_piece_6_section:
        with BuildLine():
            CenterArc((FILLET_1_R, -FILLET_1_R), FILLET_1_R, 90, 90)
            Line((0, -FILLET_1_R), (0, 0))
            Line((0, 0), (FILLET_1_R, 0))
        make_face()
    fillet_1_piece_6 = extrude(amount=45.170872431, mode=Mode.PRIVATE)
    fillet_1_piece_6 = split(fillet_1_piece_6, bisect_by=Plane(origin=(-6.25, 1.968573348, 0), z_dir=(0, 0, -1)), keep=Keep.TOP, mode=Mode.PRIVATE)
    fillet_1_piece_6 = split(fillet_1_piece_6, bisect_by=Plane(origin=(-6.25, 1.968573348, -21.75), z_dir=(0, 0, 1)), keep=Keep.TOP, mode=Mode.PRIVATE)
    add(fillet_1_piece_6)

    # 필렛2
    fillet_2_edges = [part.edges().sort_by_distance(p)[0] for p in [
        (8.125, -11.897631945, 33.75),
        (8.125, -11.897631945, -21.75),
        (-8.125, -11.897631945, 33.75),
        (-8.125, -11.897631945, -21.75),
    ]]
    fillet(fillet_2_edges, radius=FILLET_2_R)

    # 스케치21 → 컷-돌출5 (cut)
    with BuildSketch(Plane(origin=(0, 22.291069809, 0), x_dir=(1, 0, 0), z_dir=(0, 1, 0))):
        with Locations(Location((5, 9, 0), (0, 0, 270))):
            Circle(SKETCH_21_R)
        with Locations(Location((5, -1, 0), (0, 0, 270))):
            Circle(SKETCH_21_R)
        with Locations(Location((-5, 9, 0), (0, 0, 90))):
            Circle(SKETCH_21_R)
        with Locations(Location((-5, -1, 0), (0, 0, 90))):
            Circle(SKETCH_21_R)
        with Locations(Location((5, -11, 0), (0, 0, 90))):
            Circle(SKETCH_21_R)
        with Locations(Location((5, -21, 0), (0, 0, 90))):
            Circle(SKETCH_21_R)
        with Locations(Location((-5, -21, 0), (0, 0, 270))):
            Circle(SKETCH_21_R)
        with Locations(Location((-5, -11, 0), (0, 0, 270))):
            Circle(SKETCH_21_R)
    extrude(amount=-CUT_EXTRUDE_5_DEPTH, mode=Mode.SUBTRACT)


solid = part.part
